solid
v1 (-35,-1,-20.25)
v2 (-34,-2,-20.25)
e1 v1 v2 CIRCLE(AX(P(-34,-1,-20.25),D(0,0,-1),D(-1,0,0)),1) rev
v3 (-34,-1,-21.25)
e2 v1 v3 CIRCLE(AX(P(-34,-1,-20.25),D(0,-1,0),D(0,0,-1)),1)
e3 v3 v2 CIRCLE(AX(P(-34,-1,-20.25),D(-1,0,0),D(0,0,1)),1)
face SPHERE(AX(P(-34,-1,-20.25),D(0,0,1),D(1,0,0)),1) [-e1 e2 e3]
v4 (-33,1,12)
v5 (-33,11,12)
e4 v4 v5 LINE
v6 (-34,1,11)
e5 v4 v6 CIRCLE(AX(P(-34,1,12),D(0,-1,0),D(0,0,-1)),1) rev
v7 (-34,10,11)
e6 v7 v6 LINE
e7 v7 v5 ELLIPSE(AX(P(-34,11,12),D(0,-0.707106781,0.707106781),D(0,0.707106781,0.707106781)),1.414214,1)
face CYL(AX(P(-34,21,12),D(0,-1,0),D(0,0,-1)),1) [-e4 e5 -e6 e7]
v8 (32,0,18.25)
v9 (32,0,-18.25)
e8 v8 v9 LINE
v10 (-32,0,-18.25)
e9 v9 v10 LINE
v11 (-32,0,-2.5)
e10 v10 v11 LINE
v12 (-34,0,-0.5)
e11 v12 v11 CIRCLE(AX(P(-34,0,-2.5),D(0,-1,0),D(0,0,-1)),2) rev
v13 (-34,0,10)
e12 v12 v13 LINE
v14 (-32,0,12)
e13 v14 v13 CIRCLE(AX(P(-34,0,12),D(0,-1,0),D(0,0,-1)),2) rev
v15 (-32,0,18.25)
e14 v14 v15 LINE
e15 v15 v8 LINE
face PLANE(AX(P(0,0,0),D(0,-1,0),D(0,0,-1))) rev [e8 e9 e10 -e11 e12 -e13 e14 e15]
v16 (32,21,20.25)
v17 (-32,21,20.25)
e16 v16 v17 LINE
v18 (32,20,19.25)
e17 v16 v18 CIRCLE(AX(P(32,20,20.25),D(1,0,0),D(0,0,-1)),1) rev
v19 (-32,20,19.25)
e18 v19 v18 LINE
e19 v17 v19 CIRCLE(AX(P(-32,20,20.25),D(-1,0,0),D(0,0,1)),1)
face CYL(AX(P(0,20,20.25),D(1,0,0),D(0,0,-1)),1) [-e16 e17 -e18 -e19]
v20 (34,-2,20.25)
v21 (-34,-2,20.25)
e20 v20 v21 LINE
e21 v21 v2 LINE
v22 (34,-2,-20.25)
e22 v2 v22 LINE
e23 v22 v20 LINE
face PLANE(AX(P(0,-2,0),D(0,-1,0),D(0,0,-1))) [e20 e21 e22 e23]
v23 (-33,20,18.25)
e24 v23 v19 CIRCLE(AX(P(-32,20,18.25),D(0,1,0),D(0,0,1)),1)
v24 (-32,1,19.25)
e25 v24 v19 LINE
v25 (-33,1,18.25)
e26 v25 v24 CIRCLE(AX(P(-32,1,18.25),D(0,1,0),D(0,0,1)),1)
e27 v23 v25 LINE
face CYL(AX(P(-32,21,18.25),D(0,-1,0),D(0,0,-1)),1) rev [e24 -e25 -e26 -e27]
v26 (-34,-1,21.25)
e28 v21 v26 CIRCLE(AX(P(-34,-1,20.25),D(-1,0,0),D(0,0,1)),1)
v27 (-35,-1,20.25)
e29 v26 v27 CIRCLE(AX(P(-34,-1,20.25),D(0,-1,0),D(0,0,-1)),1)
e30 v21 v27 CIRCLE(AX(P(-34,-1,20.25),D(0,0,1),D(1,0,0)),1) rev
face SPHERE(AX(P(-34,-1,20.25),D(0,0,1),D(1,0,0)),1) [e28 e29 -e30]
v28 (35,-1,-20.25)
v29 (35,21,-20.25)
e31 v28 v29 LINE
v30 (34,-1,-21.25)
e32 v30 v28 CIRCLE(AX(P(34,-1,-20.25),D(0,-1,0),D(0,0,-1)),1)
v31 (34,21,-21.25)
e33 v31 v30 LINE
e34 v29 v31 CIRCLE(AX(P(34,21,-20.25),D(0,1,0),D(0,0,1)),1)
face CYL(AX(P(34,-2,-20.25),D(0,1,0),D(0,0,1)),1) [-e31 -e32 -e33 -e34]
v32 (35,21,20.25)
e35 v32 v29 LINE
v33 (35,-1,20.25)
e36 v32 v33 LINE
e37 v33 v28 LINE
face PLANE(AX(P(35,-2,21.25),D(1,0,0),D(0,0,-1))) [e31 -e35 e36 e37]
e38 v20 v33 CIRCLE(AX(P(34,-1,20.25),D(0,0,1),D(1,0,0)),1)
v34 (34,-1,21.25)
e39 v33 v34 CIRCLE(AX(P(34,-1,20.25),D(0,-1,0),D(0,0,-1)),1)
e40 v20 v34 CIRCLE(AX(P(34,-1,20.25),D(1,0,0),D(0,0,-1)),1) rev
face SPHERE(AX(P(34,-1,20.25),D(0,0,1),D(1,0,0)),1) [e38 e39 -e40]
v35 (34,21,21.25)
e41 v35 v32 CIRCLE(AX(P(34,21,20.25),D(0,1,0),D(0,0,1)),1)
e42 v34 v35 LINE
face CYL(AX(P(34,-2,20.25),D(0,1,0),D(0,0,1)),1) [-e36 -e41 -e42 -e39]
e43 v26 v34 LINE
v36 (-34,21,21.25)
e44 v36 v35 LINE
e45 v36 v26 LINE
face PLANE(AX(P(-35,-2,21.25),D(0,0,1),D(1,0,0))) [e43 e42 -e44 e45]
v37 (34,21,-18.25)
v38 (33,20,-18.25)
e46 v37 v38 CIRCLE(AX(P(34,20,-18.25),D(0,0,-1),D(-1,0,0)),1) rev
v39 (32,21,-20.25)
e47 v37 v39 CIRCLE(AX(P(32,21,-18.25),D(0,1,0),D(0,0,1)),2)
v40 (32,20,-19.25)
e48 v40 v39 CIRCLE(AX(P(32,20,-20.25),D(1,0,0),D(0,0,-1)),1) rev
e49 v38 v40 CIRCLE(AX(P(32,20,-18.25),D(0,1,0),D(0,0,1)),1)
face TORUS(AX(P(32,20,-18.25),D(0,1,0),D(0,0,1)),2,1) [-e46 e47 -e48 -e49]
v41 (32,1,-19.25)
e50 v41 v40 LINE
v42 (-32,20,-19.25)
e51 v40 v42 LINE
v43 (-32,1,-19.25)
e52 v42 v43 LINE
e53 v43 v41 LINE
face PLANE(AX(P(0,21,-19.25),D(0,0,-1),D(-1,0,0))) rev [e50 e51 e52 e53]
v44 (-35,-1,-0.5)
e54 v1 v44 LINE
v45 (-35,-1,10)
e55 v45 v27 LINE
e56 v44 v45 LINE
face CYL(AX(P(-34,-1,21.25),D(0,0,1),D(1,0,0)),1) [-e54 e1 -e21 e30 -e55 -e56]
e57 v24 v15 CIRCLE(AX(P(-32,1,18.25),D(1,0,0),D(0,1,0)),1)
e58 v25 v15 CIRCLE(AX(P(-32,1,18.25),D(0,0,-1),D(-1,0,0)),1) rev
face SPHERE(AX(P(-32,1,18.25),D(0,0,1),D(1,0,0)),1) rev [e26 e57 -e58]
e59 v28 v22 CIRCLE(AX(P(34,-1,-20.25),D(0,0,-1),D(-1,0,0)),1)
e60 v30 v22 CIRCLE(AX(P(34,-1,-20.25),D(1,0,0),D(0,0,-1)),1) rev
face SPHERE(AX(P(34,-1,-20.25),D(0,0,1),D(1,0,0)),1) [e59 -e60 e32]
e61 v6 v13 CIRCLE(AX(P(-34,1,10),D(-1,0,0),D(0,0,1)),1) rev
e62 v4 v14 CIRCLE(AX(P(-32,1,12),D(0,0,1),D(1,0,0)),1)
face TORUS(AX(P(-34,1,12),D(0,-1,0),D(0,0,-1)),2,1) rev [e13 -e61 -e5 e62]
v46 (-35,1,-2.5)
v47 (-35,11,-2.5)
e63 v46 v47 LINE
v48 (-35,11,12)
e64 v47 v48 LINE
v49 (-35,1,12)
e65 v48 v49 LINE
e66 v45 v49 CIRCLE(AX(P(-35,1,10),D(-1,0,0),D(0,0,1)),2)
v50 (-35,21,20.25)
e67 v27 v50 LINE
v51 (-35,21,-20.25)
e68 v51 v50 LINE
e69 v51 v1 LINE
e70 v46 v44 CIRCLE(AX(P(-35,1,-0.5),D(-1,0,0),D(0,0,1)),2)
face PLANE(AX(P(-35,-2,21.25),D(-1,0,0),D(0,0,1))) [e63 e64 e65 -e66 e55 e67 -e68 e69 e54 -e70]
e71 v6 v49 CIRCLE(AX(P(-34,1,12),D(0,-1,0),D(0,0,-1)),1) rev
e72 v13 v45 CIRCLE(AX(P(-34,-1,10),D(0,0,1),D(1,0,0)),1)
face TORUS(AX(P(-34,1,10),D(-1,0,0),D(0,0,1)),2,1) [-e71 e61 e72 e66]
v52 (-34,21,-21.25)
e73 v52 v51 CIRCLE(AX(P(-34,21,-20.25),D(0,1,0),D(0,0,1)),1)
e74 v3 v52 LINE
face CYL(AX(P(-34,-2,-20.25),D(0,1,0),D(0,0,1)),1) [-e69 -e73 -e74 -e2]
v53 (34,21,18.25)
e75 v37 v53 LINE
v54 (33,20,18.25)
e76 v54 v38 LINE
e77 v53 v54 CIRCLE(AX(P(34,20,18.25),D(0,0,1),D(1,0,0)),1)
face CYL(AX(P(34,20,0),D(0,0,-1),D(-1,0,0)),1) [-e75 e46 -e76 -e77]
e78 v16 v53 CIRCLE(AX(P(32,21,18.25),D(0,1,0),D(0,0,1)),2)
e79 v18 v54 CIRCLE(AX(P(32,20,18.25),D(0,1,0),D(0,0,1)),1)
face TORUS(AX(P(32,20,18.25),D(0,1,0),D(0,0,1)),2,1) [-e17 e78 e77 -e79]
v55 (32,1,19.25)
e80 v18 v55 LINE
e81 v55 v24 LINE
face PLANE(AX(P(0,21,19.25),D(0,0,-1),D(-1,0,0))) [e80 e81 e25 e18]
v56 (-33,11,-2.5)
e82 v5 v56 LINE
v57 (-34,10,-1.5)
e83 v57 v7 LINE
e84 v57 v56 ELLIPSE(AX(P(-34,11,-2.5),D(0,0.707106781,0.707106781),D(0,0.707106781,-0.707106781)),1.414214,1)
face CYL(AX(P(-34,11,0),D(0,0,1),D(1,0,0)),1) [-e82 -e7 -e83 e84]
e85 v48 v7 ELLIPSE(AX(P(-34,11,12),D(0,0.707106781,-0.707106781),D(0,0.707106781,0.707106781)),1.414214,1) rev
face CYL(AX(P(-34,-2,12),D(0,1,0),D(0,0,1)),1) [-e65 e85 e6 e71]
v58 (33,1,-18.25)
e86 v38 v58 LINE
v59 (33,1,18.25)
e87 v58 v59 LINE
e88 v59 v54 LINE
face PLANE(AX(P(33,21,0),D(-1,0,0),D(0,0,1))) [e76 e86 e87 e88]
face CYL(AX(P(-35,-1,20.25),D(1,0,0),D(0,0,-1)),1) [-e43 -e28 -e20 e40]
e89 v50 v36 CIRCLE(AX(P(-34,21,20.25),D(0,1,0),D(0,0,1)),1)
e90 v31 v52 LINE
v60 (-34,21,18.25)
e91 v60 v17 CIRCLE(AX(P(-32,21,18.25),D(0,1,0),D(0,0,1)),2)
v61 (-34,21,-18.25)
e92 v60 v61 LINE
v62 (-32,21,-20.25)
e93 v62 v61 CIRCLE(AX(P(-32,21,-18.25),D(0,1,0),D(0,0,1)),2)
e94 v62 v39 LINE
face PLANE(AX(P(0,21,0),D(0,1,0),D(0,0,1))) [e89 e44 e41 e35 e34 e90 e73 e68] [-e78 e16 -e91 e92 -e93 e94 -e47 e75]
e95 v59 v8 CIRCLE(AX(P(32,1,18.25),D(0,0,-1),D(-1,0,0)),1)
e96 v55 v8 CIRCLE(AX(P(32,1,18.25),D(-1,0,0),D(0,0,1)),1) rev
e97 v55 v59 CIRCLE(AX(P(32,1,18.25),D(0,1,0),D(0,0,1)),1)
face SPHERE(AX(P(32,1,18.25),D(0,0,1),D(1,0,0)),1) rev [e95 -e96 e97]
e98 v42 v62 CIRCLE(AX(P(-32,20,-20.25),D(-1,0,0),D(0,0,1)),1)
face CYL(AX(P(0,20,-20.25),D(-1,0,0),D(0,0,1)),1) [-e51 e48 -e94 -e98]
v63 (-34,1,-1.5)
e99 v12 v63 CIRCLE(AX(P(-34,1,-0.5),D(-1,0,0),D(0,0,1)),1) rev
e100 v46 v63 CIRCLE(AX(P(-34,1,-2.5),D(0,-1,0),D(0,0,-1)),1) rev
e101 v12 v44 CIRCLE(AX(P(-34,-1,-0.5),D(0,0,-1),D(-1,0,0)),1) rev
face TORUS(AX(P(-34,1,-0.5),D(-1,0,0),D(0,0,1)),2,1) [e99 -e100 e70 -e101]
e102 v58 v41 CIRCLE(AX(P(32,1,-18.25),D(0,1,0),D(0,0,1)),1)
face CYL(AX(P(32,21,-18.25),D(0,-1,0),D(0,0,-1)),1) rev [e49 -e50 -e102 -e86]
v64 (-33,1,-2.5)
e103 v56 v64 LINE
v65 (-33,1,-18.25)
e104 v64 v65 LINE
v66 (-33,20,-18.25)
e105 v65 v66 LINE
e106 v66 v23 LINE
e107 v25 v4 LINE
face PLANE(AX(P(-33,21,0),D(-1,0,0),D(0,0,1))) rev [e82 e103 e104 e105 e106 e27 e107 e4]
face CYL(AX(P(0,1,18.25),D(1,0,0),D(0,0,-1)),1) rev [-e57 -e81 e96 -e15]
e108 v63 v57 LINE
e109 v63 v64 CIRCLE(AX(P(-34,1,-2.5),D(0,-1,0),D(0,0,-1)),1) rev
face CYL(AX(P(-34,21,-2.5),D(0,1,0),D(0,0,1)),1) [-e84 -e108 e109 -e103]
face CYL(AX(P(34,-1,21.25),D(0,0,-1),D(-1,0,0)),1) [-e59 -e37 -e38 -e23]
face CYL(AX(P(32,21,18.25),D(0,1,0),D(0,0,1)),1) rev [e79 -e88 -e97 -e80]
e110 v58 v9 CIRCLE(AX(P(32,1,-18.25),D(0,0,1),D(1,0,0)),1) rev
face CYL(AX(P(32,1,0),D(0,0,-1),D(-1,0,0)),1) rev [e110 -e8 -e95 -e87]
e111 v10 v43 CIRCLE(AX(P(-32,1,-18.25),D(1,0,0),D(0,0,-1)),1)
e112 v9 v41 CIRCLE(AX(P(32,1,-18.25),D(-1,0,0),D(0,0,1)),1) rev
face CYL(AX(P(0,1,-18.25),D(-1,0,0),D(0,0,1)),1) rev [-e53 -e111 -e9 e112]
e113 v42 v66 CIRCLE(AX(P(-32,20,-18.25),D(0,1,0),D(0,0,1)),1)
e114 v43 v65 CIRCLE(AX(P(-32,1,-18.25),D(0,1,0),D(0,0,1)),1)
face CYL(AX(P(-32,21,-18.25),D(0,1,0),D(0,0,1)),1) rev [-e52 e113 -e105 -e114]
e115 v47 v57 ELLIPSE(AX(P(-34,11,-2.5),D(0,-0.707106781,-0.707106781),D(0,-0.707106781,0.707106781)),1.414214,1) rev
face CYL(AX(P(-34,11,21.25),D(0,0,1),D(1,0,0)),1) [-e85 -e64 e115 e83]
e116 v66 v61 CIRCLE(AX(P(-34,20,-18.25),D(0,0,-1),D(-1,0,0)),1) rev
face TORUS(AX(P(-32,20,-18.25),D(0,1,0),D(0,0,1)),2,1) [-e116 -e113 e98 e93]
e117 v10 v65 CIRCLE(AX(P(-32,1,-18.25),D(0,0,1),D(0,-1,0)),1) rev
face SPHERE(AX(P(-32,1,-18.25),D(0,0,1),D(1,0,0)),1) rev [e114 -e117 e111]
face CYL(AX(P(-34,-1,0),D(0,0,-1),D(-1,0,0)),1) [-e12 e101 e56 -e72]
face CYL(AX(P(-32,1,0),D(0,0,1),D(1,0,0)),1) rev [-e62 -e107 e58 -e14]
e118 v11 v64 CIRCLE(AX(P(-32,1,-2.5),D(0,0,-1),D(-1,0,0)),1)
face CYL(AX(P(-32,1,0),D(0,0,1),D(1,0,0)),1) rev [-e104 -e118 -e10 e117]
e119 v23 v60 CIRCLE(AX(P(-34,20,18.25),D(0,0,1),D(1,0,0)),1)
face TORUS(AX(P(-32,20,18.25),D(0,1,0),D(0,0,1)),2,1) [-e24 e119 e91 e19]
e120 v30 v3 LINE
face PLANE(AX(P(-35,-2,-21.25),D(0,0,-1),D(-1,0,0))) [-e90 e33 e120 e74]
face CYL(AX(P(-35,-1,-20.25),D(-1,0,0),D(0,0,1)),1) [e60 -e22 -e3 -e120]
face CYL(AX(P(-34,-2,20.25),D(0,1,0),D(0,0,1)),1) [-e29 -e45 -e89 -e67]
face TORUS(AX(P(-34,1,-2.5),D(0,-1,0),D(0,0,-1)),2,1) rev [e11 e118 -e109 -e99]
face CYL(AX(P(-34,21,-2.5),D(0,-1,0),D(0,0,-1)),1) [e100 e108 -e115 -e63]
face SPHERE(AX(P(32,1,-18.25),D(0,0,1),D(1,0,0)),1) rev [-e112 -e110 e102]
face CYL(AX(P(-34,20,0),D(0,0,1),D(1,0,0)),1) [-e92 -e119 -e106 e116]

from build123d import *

# Parameters (mm, degrees)
SKETCH1_W           = 70
SKETCH1_H           = 42.5
BOSS_EXTRUDE1_DEPTH = 2
BOSS_EXTRUDE2_DEPTH = 21
SKETCH3_W           = 2
SKETCH3_H           = 12.5
BOSS_EXTRUDE3_DEPTH = 11
FILLET2_R           = 1


with BuildPart() as part:
    # Sketch1 → Boss-Extrude1 (new body)
    with BuildSketch(Plane(origin=(0, 0, 0), x_dir=(1, 0, 0), z_dir=(0, 1, 0))):
        Rectangle(SKETCH1_W, SKETCH1_H)
    extrude(amount=-BOSS_EXTRUDE1_DEPTH)

    # Sketch2 → Boss-Extrude2 (add)
    with BuildSketch(Plane(origin=(0, 0, 0), x_dir=(-1, 0, 0), z_dir=(0, 1, 0))):
        Polygon((-33, 19.25), (33, 19.25), (33, 11), (35, 11), (35, 21.25), (-35, 21.25), (-35, -21.25), (35, -21.25), (35, -1.5), (33, -1.5), (33, -19.25), (-33, -19.25), align=None)
    extrude(amount=BOSS_EXTRUDE2_DEPTH)

    # Sketch3 → Boss-Extrude3 (add)
    with BuildSketch(Plane(origin=(0, 21, 0), x_dir=(1, 0, 0), z_dir=(0, 1, 0))):
        with Locations((-34, -4.75)):
            Rectangle(SKETCH3_W, SKETCH3_H)
    extrude(amount=-BOSS_EXTRUDE3_DEPTH)

    # Fillet2
    fillet2_edges = [part.edges().sort_by_distance(p)[0] for p in [
        (35, -2, 0),
        (-35, 0, 4.75),
        (0, -2, -21.25),
        (-33, 0, -10.375),
        (0, 0, -19.25),
        (-33, 10.5, -19.25),
        (33, 21, 0),
        (33, 10.5, -19.25),
        (0, 21, 19.25),
        (33, 10.5, 19.25),
        (-33, 0, 15.125),
        (-33, 10.5, 19.25),
        (-34, 0, 11),
        (-33, 21, 0),
        (0, 21, -19.25),
        (-34, 0, -1.5),
        (0, 0, 19.25),
        (33, 0, 0),
        (-35, 5, 11),
        (-33, 5, 11),
        (-33, 5, -1.5),
        (-35, 5, -1.5),
        (-35, -2, 0),
        (-33, 10, 4.75),
        (-35, 10, 4.75),
        (-35, 9.5, -21.25),
        (35, 9.5, -21.25),
        (35, 9.5, 21.25),
        (-35, 9.5, 21.25),
        (0, -2, 21.25),
    ]]
    fillet(fillet2_edges, radius=FILLET2_R - 0.0001)  # a hair under: the kernel refuses the full size


solid = part.part
